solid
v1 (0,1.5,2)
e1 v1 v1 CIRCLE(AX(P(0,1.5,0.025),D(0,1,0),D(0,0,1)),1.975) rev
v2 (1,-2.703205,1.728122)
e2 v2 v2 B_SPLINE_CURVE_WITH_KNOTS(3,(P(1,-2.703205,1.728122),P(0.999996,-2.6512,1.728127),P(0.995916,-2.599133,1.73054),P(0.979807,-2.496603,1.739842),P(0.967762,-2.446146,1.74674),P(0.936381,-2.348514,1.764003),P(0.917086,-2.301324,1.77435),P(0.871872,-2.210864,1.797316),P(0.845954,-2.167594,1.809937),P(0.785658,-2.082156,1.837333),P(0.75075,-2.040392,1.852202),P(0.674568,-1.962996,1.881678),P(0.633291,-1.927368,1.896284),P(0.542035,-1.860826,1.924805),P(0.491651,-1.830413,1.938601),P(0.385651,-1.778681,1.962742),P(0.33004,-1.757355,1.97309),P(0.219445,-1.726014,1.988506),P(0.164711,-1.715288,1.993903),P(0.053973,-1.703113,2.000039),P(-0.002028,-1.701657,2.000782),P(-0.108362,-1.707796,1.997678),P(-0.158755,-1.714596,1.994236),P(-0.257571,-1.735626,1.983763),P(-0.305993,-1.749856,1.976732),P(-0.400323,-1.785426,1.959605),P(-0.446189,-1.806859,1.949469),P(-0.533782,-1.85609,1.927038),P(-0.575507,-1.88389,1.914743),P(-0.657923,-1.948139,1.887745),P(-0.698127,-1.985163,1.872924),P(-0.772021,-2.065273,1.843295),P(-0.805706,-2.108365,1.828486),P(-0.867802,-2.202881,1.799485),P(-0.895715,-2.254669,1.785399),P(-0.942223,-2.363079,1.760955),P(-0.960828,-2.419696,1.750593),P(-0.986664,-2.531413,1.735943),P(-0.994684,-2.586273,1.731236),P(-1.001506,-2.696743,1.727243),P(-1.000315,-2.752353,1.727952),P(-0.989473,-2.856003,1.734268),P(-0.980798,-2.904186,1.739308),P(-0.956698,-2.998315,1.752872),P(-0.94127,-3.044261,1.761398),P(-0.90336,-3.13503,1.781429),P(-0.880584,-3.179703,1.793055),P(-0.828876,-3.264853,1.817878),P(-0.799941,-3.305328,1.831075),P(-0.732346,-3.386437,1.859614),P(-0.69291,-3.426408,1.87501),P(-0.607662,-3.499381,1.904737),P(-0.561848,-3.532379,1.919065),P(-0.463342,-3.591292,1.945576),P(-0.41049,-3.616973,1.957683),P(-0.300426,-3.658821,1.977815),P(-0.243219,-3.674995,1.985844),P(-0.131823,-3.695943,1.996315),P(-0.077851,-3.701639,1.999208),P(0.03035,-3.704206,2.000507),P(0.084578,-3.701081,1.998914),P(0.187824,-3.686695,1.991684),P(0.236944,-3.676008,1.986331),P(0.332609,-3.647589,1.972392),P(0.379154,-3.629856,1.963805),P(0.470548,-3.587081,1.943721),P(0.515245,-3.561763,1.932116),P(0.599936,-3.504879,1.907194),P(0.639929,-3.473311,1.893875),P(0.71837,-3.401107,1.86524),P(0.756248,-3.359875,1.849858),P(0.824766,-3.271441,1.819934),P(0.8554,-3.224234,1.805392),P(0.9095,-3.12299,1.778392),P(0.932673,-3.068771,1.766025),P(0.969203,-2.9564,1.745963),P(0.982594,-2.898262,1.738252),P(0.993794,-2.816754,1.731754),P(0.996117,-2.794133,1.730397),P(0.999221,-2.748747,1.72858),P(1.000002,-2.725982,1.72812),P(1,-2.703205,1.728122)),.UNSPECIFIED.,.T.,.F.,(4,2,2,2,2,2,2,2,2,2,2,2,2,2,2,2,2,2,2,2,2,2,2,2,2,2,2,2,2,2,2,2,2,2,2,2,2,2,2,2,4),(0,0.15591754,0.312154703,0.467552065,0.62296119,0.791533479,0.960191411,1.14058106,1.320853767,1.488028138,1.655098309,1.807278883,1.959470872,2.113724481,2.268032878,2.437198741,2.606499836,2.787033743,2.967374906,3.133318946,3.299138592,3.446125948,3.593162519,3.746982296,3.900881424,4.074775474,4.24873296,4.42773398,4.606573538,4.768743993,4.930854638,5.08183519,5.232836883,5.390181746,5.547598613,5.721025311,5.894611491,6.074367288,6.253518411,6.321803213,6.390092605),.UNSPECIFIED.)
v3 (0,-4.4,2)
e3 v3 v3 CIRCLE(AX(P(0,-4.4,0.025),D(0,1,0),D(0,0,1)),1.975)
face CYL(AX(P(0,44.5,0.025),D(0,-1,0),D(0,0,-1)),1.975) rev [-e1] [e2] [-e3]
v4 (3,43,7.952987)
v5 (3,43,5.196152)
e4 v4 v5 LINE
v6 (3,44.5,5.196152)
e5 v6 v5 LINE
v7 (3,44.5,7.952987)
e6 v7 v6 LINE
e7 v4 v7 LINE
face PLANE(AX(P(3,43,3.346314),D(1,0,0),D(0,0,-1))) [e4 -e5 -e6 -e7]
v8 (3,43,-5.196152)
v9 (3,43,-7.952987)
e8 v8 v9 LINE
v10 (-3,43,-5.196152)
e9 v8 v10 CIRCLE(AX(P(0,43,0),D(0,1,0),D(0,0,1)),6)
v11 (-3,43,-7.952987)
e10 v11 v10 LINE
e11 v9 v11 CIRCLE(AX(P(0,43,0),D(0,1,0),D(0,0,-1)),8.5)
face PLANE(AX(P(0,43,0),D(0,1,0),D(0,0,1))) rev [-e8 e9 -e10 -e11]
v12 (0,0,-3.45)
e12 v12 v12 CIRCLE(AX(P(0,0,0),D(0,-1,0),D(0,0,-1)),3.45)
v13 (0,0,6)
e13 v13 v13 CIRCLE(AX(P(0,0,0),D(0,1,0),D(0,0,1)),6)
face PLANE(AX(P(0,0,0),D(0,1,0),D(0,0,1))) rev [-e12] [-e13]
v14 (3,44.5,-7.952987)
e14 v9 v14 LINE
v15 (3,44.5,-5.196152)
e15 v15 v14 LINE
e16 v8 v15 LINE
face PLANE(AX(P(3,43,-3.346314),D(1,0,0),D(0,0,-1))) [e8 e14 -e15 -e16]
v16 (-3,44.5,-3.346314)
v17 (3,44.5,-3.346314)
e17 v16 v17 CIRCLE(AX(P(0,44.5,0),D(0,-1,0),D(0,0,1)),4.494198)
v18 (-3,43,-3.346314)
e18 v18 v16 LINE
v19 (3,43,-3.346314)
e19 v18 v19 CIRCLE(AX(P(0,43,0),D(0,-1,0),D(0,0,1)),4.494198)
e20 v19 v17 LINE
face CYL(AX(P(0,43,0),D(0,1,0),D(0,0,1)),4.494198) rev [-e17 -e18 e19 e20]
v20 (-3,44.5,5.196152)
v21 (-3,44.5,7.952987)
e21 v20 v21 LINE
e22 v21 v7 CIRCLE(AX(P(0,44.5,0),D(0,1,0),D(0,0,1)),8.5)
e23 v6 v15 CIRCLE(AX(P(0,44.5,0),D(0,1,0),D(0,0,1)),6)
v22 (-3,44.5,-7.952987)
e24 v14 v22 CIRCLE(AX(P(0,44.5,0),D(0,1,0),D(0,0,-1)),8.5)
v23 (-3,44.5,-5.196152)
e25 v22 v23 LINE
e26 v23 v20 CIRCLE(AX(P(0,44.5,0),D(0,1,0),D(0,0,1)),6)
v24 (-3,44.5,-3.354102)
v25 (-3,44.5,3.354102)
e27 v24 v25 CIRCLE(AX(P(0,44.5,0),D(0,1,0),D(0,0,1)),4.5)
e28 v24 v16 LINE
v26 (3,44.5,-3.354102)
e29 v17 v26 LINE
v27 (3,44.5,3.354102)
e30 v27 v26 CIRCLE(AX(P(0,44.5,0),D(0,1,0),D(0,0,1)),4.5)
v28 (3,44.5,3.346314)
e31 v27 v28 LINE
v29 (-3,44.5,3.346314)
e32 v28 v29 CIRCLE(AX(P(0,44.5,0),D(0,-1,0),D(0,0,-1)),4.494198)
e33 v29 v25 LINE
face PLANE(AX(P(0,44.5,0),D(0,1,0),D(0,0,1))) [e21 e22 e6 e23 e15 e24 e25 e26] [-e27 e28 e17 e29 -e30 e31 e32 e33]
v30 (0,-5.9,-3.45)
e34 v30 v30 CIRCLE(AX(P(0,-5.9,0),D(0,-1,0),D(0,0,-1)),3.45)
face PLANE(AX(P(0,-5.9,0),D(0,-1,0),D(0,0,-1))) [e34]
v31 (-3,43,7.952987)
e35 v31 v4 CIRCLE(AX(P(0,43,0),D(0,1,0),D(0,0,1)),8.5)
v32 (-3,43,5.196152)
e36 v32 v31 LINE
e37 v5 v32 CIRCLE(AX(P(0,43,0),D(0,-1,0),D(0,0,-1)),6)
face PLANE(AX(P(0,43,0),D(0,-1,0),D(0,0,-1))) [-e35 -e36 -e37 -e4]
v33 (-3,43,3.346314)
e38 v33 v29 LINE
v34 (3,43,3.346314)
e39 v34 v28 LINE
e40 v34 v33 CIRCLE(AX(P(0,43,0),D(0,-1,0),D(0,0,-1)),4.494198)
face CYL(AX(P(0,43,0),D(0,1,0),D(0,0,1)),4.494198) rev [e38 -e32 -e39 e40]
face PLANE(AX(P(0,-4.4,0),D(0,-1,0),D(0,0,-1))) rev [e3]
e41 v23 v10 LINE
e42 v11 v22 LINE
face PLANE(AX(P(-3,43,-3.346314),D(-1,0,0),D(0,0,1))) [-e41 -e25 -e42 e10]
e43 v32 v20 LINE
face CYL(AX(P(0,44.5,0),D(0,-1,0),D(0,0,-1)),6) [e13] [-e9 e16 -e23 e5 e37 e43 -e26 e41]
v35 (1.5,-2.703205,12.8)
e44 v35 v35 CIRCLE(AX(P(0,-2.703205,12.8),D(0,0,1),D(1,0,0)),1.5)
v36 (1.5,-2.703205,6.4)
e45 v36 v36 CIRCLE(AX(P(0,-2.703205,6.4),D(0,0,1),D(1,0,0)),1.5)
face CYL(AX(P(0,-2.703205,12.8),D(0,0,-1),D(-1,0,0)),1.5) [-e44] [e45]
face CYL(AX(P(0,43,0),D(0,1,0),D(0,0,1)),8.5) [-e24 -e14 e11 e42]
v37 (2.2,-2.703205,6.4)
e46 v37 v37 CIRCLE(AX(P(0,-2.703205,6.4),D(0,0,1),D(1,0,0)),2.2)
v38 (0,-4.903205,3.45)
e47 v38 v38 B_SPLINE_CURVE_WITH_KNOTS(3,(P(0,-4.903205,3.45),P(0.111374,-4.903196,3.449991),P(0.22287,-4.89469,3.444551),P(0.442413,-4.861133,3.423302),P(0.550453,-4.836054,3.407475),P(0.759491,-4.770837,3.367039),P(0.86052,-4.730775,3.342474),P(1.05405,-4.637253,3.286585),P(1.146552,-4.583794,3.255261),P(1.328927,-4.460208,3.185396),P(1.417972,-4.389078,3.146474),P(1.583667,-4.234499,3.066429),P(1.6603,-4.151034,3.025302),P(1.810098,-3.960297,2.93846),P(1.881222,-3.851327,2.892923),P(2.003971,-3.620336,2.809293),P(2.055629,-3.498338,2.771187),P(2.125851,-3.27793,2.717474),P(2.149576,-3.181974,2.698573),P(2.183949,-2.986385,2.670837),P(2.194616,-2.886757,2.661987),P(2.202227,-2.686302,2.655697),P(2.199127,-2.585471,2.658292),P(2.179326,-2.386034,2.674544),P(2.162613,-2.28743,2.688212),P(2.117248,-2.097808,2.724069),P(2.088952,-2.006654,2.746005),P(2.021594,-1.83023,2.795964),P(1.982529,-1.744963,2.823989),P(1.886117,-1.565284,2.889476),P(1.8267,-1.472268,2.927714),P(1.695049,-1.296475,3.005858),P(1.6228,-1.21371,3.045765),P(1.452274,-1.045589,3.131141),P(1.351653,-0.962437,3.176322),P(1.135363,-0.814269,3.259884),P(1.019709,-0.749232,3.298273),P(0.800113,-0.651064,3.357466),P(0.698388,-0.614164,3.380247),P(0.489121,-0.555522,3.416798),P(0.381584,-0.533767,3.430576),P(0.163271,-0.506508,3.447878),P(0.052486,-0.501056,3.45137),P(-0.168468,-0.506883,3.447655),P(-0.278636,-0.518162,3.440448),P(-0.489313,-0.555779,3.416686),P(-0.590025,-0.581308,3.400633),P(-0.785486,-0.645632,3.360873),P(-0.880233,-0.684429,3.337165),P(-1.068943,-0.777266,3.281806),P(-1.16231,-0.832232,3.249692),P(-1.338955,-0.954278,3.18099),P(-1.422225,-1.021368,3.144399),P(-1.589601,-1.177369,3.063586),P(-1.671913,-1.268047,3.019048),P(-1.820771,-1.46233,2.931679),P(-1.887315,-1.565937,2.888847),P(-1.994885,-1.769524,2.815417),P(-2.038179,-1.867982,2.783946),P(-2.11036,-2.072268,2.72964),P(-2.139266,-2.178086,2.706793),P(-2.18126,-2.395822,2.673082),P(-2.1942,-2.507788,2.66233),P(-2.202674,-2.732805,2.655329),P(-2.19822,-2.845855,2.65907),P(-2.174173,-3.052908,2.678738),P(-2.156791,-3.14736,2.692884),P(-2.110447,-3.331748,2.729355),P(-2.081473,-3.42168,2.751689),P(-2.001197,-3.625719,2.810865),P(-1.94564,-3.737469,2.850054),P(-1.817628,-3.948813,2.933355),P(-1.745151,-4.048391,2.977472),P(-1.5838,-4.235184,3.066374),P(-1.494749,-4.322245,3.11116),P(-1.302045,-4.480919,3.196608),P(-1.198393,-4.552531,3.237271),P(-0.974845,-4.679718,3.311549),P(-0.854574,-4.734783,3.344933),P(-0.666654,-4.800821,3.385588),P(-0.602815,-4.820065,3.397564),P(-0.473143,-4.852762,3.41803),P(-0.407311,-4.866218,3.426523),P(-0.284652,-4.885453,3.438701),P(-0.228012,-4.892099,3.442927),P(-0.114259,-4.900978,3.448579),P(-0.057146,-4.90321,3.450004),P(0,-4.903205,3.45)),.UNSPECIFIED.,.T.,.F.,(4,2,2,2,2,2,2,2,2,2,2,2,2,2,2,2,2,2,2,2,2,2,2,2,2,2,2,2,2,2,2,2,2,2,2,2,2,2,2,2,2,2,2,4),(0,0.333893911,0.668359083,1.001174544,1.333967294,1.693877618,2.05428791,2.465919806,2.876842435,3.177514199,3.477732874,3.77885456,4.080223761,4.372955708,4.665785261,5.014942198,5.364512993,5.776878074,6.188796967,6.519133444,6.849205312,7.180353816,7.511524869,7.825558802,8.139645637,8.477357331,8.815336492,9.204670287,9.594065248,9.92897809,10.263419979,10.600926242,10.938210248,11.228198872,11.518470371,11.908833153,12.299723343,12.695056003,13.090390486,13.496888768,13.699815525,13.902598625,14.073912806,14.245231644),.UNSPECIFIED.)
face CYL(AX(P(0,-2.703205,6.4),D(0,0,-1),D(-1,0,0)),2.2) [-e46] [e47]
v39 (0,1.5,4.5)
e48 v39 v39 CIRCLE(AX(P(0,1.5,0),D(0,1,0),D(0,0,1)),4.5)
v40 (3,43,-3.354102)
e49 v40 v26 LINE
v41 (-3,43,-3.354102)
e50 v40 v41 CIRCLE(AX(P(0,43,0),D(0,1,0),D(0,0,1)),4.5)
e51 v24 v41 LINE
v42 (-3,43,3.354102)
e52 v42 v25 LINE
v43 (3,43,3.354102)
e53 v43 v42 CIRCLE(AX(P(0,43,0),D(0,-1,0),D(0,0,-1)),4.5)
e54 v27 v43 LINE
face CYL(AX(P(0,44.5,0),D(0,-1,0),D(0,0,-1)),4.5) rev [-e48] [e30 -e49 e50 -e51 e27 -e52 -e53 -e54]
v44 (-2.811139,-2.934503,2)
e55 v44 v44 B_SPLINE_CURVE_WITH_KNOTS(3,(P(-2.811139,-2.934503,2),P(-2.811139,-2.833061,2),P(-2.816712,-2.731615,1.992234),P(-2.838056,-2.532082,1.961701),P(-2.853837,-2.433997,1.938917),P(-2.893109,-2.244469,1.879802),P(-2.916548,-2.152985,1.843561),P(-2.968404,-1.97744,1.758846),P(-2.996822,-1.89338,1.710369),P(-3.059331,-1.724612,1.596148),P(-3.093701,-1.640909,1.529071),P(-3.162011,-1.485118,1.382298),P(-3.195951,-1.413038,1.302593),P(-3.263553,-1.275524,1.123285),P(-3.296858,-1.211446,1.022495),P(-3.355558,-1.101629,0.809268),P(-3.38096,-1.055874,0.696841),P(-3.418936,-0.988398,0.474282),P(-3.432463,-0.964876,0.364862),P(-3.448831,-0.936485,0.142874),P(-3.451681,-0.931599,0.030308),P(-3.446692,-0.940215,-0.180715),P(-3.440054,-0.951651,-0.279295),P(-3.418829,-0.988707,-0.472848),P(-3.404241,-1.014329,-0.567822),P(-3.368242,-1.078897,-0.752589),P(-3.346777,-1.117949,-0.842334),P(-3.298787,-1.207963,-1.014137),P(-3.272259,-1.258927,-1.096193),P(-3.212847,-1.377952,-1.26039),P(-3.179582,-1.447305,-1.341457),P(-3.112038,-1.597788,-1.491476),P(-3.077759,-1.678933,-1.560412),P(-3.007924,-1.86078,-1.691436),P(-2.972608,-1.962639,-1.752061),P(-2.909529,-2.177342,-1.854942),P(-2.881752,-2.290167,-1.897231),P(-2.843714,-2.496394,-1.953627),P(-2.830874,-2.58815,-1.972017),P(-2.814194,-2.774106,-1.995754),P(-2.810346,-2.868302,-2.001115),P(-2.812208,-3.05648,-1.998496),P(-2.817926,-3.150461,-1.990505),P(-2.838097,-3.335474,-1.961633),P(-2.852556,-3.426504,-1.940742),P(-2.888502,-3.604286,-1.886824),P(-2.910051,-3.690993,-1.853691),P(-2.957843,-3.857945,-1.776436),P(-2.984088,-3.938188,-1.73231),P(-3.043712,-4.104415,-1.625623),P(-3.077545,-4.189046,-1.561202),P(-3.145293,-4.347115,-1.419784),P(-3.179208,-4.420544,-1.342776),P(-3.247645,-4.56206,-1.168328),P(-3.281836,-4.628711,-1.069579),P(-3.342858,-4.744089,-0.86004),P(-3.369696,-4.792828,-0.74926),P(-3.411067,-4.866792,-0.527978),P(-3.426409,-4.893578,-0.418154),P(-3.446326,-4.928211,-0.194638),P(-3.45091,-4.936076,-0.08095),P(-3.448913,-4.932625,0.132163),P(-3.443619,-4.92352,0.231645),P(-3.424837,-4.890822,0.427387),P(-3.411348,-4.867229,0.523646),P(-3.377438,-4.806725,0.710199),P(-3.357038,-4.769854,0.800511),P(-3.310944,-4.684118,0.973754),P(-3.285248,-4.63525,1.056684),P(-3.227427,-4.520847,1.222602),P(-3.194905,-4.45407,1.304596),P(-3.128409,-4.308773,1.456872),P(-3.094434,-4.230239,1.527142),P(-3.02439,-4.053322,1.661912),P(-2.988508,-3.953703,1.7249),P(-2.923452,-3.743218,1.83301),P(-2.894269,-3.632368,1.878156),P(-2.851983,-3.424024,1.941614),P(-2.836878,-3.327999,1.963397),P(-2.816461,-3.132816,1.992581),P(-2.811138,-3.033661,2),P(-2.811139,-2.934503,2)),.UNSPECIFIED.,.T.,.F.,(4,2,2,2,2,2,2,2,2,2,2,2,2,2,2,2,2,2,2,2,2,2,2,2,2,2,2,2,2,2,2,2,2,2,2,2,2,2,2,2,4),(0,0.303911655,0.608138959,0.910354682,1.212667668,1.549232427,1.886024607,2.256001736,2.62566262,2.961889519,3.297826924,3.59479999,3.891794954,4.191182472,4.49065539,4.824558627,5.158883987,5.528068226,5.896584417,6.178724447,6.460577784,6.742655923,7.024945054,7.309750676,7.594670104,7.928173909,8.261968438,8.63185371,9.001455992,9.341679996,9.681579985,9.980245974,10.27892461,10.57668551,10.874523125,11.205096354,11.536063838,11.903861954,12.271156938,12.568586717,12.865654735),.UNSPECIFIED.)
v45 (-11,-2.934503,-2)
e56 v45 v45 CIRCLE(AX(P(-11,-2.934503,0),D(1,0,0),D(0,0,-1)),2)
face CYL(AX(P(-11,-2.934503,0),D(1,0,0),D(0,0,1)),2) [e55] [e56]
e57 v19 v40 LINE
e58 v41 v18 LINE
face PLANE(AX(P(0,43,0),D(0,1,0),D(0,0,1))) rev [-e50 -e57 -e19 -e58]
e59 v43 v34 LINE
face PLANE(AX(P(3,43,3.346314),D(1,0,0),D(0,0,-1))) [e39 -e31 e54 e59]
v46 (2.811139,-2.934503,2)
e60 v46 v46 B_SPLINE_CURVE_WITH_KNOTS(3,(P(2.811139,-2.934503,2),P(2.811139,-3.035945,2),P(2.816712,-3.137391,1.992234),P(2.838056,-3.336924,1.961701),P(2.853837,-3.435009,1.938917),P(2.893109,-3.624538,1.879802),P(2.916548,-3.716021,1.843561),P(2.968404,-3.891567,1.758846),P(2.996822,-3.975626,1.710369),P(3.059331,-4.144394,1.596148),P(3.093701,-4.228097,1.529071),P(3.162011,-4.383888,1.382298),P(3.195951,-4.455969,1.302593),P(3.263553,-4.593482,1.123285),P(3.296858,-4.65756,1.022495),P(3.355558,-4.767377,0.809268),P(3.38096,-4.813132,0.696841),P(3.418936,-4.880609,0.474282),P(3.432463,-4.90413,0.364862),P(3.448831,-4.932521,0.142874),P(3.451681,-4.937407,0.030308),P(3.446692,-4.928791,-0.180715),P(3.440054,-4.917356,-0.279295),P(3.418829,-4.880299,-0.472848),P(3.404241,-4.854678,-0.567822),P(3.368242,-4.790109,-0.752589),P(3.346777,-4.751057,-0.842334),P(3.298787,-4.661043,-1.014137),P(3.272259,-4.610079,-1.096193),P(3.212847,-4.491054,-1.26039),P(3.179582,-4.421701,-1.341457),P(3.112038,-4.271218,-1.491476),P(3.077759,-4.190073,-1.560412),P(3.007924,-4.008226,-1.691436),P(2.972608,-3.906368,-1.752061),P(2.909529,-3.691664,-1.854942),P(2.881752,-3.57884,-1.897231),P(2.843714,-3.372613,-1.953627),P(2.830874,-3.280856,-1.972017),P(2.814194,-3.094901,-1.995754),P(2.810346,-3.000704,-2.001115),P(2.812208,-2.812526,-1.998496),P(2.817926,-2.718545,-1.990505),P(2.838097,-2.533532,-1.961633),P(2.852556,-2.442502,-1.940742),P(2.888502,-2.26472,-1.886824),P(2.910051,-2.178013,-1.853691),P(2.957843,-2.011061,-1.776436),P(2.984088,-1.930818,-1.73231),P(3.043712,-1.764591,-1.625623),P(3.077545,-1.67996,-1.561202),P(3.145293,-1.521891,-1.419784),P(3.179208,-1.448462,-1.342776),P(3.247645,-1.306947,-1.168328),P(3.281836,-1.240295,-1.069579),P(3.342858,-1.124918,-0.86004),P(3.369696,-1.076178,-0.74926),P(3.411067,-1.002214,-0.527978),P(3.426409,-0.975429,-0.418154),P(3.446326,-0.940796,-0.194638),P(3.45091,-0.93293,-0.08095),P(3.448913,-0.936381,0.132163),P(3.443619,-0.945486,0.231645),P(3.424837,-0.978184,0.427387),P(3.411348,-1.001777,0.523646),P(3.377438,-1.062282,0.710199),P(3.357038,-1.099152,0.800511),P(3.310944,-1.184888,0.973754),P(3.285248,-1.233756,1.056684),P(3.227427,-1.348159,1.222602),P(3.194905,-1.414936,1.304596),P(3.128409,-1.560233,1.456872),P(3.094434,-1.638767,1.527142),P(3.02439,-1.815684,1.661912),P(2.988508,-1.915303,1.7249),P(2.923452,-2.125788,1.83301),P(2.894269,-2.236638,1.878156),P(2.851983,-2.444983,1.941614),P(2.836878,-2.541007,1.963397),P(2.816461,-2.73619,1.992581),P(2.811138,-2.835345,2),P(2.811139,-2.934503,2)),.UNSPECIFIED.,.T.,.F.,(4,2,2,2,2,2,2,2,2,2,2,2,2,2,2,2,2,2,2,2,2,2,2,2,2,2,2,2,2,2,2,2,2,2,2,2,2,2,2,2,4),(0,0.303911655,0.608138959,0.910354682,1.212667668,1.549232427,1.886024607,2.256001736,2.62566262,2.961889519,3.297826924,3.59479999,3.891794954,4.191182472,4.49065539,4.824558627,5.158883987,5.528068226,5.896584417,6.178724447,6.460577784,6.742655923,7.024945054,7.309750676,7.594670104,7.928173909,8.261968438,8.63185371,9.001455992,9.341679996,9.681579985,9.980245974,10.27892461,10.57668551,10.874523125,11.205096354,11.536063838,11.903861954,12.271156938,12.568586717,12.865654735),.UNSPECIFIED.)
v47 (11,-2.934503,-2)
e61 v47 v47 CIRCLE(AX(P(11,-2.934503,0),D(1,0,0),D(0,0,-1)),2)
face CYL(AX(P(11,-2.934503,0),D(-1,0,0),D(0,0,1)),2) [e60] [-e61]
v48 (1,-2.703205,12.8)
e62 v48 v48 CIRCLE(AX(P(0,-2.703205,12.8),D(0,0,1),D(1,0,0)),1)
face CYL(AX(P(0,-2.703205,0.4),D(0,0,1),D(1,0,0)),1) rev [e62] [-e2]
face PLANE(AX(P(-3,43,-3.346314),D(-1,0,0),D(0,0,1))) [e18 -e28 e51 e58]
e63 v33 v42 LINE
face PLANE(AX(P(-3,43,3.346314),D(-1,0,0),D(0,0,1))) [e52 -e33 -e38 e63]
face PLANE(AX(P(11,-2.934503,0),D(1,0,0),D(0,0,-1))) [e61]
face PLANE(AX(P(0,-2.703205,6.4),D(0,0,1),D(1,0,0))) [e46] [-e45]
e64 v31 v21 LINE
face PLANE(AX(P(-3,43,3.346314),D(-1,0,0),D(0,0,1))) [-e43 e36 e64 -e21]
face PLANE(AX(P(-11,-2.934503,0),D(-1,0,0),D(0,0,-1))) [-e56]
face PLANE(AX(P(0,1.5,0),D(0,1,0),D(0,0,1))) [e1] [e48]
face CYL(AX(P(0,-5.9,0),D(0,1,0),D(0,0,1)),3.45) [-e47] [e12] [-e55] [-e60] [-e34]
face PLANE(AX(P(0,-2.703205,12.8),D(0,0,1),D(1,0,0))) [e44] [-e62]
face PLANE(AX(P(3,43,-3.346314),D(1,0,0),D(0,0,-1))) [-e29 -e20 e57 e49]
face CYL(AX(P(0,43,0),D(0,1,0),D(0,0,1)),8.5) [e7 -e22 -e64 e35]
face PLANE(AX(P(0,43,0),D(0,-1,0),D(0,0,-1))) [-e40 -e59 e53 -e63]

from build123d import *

# Parameters (mm, degrees)
SKETCH1_R           = 6
BOSS_EXTRUDE1_DEPTH = 44.5
SHELL1_T            = -1.5
SKETCH3_R           = 3.45
BOSS_EXTRUDE3_DEPTH = 5.9
SHELL2_START        = -4.4
SHELL2_OUTLINE_R    = 1.95
SHELL2_DEPTH        = 5.9
SKETCH5_R           = 2.2
BOSS_EXTRUDE4_DEPTH = 6.4
SKETCH6_R           = 1.5
BOSS_EXTRUDE5_DEPTH = 6.4
SKETCH7_R           = 1
CUT_EXTRUDE1_DEPTH  = 12.4
SKETCH8_R           = 1.95
CUT_EXTRUDE2_DEPTH  = 51.902357509
SKETCH9_R           = 2
BOSS_EXTRUDE6_DEPTH = 11
SKETCH10_R          = 1.975
CUT_EXTRUDE3_DEPTH  = 52.730551947
SKETCH11_R          = 1
CUT_EXTRUDE4_DEPTH  = 12
BOSS_EXTRUDE9_DEPTH = 1.5


# Read off the part's stored shape, not the designer's step: Shell2
with BuildPart() as part:
    # Sketch1 → Boss-Extrude1 (new body)
    with BuildSketch(Plane(origin=(0, 0, 0), x_dir=(1, 0, 0), z_dir=(0, 1, 0))):
        with Locations(Location((0, 0, 0), (0, 0, 270))):
            Circle(SKETCH1_R)
    extrude(amount=BOSS_EXTRUDE1_DEPTH)

    # Shell1
    shell1_openings = [part.faces().sort_by_distance(p)[0] for p in [
        (0, 44.5, 0),
    ]]
    offset(amount=SHELL1_T, openings=shell1_openings, kind=Kind.INTERSECTION)

    # Sketch3 → Boss-Extrude3 (add)
    with BuildSketch(Plane.XZ):
        with Locations(Location((0, 0, 0), (0, 0, 270))):
            Circle(SKETCH3_R)
    extrude(amount=BOSS_EXTRUDE3_DEPTH)

    # Shell2 outline → Shell2 (cut)
    with BuildSketch(Plane(origin=(0, 0, 0), x_dir=(1, 0, 0), z_dir=(0, 1, 0)).offset(SHELL2_START)):
        Circle(SHELL2_OUTLINE_R)
    extrude(amount=SHELL2_DEPTH, mode=Mode.SUBTRACT)

    # Sketch5 → Boss-Extrude4 (add)
    with BuildSketch(Plane.XY):
        with Locations(Location((0, -2.70320485, 0), (0, 0, 270))):
            Circle(SKETCH5_R)
    extrude(amount=BOSS_EXTRUDE4_DEPTH)

    # Sketch6 → Boss-Extrude5 (add)
    with BuildSketch(Plane.XY.offset(6.4)):
        with Locations((0, -2.70320485)):
            Circle(SKETCH6_R)
    extrude(amount=BOSS_EXTRUDE5_DEPTH)

    # Sketch7 → Cut-Extrude1 (cut)
    with BuildSketch(Plane.XY.offset(12.8)):
        with Locations((0, -2.70320485)):
            Circle(SKETCH7_R)
    extrude(amount=-CUT_EXTRUDE1_DEPTH, mode=Mode.SUBTRACT)

    # Sketch8 → Cut-Extrude2 (cut, through all)
    with BuildSketch(Plane(origin=(0, -4.4, 0), x_dir=(1, 0, 0), z_dir=(0, 1, 0))):
        with Locations(Location((0, 0, 0), (0, 0, 270))):
            Circle(SKETCH8_R)
    extrude(amount=CUT_EXTRUDE2_DEPTH, mode=Mode.SUBTRACT)

    # Sketch9 → Boss-Extrude6 (add)
    with BuildSketch(Plane(origin=(0, 0, 0), x_dir=(0, 0, -1), z_dir=(1, 0, 0))):
        with Locations(Location((0, -2.934503104, 0), (0, 0, 180))):
            Circle(SKETCH9_R)
    extrude(amount=BOSS_EXTRUDE6_DEPTH)

    # Sketch10 → Cut-Extrude3 (cut, through all)
    with BuildSketch(Plane(origin=(0, -4.4, 0), x_dir=(1, 0, 0), z_dir=(0, 1, 0))):
        with Locations(Location((0, -0.025, 0), (0, 0, 270))):
            Circle(SKETCH10_R)
    extrude(amount=CUT_EXTRUDE3_DEPTH, mode=Mode.SUBTRACT)

    # Sketch11 → Cut-Extrude4 (cut)
    with BuildSketch(Plane.XY.offset(12.8)):
        with Locations((0, -2.70320485)):
            Circle(SKETCH11_R)
    extrude(amount=-CUT_EXTRUDE4_DEPTH, mode=Mode.SUBTRACT)

    # Mirror5: part across plane


with BuildPart() as part_1:
    add(part.part)
    add(part.part.mirror(Plane(origin=(0, 0, 0), x_dir=(0, 0, 1), z_dir=(1, 0, 0))))

    # Sketch14 → Boss-Extrude9 (add)
    with BuildSketch(Plane(origin=(0, 44.5, 0), x_dir=(1, 0, 0), z_dir=(0, 1, 0))):
        with BuildLine():
            Line((-3, -3.346313625), (-3, -7.95298686))
            ThreePointArc((-3, -7.95298686), (0, -8.5), (3, -7.95298686))
            Line((3, -7.95298686), (3, -3.346313625))
            ThreePointArc((3, -3.346313625), (0, -4.494197912), (-3, -3.346313625))
        make_face()
        with BuildLine():
            Line((3, 3.346313625), (3, 7.95298686))
            ThreePointArc((3, 7.95298686), (0, 8.5), (-3, 7.95298686))
            Line((-3, 7.95298686), (-3, 3.346313625))
            ThreePointArc((-3, 3.346313625), (0, 4.494197912), (3, 3.346313625))
        make_face()
    extrude(amount=-BOSS_EXTRUDE9_DEPTH)


solid = part_1.part
